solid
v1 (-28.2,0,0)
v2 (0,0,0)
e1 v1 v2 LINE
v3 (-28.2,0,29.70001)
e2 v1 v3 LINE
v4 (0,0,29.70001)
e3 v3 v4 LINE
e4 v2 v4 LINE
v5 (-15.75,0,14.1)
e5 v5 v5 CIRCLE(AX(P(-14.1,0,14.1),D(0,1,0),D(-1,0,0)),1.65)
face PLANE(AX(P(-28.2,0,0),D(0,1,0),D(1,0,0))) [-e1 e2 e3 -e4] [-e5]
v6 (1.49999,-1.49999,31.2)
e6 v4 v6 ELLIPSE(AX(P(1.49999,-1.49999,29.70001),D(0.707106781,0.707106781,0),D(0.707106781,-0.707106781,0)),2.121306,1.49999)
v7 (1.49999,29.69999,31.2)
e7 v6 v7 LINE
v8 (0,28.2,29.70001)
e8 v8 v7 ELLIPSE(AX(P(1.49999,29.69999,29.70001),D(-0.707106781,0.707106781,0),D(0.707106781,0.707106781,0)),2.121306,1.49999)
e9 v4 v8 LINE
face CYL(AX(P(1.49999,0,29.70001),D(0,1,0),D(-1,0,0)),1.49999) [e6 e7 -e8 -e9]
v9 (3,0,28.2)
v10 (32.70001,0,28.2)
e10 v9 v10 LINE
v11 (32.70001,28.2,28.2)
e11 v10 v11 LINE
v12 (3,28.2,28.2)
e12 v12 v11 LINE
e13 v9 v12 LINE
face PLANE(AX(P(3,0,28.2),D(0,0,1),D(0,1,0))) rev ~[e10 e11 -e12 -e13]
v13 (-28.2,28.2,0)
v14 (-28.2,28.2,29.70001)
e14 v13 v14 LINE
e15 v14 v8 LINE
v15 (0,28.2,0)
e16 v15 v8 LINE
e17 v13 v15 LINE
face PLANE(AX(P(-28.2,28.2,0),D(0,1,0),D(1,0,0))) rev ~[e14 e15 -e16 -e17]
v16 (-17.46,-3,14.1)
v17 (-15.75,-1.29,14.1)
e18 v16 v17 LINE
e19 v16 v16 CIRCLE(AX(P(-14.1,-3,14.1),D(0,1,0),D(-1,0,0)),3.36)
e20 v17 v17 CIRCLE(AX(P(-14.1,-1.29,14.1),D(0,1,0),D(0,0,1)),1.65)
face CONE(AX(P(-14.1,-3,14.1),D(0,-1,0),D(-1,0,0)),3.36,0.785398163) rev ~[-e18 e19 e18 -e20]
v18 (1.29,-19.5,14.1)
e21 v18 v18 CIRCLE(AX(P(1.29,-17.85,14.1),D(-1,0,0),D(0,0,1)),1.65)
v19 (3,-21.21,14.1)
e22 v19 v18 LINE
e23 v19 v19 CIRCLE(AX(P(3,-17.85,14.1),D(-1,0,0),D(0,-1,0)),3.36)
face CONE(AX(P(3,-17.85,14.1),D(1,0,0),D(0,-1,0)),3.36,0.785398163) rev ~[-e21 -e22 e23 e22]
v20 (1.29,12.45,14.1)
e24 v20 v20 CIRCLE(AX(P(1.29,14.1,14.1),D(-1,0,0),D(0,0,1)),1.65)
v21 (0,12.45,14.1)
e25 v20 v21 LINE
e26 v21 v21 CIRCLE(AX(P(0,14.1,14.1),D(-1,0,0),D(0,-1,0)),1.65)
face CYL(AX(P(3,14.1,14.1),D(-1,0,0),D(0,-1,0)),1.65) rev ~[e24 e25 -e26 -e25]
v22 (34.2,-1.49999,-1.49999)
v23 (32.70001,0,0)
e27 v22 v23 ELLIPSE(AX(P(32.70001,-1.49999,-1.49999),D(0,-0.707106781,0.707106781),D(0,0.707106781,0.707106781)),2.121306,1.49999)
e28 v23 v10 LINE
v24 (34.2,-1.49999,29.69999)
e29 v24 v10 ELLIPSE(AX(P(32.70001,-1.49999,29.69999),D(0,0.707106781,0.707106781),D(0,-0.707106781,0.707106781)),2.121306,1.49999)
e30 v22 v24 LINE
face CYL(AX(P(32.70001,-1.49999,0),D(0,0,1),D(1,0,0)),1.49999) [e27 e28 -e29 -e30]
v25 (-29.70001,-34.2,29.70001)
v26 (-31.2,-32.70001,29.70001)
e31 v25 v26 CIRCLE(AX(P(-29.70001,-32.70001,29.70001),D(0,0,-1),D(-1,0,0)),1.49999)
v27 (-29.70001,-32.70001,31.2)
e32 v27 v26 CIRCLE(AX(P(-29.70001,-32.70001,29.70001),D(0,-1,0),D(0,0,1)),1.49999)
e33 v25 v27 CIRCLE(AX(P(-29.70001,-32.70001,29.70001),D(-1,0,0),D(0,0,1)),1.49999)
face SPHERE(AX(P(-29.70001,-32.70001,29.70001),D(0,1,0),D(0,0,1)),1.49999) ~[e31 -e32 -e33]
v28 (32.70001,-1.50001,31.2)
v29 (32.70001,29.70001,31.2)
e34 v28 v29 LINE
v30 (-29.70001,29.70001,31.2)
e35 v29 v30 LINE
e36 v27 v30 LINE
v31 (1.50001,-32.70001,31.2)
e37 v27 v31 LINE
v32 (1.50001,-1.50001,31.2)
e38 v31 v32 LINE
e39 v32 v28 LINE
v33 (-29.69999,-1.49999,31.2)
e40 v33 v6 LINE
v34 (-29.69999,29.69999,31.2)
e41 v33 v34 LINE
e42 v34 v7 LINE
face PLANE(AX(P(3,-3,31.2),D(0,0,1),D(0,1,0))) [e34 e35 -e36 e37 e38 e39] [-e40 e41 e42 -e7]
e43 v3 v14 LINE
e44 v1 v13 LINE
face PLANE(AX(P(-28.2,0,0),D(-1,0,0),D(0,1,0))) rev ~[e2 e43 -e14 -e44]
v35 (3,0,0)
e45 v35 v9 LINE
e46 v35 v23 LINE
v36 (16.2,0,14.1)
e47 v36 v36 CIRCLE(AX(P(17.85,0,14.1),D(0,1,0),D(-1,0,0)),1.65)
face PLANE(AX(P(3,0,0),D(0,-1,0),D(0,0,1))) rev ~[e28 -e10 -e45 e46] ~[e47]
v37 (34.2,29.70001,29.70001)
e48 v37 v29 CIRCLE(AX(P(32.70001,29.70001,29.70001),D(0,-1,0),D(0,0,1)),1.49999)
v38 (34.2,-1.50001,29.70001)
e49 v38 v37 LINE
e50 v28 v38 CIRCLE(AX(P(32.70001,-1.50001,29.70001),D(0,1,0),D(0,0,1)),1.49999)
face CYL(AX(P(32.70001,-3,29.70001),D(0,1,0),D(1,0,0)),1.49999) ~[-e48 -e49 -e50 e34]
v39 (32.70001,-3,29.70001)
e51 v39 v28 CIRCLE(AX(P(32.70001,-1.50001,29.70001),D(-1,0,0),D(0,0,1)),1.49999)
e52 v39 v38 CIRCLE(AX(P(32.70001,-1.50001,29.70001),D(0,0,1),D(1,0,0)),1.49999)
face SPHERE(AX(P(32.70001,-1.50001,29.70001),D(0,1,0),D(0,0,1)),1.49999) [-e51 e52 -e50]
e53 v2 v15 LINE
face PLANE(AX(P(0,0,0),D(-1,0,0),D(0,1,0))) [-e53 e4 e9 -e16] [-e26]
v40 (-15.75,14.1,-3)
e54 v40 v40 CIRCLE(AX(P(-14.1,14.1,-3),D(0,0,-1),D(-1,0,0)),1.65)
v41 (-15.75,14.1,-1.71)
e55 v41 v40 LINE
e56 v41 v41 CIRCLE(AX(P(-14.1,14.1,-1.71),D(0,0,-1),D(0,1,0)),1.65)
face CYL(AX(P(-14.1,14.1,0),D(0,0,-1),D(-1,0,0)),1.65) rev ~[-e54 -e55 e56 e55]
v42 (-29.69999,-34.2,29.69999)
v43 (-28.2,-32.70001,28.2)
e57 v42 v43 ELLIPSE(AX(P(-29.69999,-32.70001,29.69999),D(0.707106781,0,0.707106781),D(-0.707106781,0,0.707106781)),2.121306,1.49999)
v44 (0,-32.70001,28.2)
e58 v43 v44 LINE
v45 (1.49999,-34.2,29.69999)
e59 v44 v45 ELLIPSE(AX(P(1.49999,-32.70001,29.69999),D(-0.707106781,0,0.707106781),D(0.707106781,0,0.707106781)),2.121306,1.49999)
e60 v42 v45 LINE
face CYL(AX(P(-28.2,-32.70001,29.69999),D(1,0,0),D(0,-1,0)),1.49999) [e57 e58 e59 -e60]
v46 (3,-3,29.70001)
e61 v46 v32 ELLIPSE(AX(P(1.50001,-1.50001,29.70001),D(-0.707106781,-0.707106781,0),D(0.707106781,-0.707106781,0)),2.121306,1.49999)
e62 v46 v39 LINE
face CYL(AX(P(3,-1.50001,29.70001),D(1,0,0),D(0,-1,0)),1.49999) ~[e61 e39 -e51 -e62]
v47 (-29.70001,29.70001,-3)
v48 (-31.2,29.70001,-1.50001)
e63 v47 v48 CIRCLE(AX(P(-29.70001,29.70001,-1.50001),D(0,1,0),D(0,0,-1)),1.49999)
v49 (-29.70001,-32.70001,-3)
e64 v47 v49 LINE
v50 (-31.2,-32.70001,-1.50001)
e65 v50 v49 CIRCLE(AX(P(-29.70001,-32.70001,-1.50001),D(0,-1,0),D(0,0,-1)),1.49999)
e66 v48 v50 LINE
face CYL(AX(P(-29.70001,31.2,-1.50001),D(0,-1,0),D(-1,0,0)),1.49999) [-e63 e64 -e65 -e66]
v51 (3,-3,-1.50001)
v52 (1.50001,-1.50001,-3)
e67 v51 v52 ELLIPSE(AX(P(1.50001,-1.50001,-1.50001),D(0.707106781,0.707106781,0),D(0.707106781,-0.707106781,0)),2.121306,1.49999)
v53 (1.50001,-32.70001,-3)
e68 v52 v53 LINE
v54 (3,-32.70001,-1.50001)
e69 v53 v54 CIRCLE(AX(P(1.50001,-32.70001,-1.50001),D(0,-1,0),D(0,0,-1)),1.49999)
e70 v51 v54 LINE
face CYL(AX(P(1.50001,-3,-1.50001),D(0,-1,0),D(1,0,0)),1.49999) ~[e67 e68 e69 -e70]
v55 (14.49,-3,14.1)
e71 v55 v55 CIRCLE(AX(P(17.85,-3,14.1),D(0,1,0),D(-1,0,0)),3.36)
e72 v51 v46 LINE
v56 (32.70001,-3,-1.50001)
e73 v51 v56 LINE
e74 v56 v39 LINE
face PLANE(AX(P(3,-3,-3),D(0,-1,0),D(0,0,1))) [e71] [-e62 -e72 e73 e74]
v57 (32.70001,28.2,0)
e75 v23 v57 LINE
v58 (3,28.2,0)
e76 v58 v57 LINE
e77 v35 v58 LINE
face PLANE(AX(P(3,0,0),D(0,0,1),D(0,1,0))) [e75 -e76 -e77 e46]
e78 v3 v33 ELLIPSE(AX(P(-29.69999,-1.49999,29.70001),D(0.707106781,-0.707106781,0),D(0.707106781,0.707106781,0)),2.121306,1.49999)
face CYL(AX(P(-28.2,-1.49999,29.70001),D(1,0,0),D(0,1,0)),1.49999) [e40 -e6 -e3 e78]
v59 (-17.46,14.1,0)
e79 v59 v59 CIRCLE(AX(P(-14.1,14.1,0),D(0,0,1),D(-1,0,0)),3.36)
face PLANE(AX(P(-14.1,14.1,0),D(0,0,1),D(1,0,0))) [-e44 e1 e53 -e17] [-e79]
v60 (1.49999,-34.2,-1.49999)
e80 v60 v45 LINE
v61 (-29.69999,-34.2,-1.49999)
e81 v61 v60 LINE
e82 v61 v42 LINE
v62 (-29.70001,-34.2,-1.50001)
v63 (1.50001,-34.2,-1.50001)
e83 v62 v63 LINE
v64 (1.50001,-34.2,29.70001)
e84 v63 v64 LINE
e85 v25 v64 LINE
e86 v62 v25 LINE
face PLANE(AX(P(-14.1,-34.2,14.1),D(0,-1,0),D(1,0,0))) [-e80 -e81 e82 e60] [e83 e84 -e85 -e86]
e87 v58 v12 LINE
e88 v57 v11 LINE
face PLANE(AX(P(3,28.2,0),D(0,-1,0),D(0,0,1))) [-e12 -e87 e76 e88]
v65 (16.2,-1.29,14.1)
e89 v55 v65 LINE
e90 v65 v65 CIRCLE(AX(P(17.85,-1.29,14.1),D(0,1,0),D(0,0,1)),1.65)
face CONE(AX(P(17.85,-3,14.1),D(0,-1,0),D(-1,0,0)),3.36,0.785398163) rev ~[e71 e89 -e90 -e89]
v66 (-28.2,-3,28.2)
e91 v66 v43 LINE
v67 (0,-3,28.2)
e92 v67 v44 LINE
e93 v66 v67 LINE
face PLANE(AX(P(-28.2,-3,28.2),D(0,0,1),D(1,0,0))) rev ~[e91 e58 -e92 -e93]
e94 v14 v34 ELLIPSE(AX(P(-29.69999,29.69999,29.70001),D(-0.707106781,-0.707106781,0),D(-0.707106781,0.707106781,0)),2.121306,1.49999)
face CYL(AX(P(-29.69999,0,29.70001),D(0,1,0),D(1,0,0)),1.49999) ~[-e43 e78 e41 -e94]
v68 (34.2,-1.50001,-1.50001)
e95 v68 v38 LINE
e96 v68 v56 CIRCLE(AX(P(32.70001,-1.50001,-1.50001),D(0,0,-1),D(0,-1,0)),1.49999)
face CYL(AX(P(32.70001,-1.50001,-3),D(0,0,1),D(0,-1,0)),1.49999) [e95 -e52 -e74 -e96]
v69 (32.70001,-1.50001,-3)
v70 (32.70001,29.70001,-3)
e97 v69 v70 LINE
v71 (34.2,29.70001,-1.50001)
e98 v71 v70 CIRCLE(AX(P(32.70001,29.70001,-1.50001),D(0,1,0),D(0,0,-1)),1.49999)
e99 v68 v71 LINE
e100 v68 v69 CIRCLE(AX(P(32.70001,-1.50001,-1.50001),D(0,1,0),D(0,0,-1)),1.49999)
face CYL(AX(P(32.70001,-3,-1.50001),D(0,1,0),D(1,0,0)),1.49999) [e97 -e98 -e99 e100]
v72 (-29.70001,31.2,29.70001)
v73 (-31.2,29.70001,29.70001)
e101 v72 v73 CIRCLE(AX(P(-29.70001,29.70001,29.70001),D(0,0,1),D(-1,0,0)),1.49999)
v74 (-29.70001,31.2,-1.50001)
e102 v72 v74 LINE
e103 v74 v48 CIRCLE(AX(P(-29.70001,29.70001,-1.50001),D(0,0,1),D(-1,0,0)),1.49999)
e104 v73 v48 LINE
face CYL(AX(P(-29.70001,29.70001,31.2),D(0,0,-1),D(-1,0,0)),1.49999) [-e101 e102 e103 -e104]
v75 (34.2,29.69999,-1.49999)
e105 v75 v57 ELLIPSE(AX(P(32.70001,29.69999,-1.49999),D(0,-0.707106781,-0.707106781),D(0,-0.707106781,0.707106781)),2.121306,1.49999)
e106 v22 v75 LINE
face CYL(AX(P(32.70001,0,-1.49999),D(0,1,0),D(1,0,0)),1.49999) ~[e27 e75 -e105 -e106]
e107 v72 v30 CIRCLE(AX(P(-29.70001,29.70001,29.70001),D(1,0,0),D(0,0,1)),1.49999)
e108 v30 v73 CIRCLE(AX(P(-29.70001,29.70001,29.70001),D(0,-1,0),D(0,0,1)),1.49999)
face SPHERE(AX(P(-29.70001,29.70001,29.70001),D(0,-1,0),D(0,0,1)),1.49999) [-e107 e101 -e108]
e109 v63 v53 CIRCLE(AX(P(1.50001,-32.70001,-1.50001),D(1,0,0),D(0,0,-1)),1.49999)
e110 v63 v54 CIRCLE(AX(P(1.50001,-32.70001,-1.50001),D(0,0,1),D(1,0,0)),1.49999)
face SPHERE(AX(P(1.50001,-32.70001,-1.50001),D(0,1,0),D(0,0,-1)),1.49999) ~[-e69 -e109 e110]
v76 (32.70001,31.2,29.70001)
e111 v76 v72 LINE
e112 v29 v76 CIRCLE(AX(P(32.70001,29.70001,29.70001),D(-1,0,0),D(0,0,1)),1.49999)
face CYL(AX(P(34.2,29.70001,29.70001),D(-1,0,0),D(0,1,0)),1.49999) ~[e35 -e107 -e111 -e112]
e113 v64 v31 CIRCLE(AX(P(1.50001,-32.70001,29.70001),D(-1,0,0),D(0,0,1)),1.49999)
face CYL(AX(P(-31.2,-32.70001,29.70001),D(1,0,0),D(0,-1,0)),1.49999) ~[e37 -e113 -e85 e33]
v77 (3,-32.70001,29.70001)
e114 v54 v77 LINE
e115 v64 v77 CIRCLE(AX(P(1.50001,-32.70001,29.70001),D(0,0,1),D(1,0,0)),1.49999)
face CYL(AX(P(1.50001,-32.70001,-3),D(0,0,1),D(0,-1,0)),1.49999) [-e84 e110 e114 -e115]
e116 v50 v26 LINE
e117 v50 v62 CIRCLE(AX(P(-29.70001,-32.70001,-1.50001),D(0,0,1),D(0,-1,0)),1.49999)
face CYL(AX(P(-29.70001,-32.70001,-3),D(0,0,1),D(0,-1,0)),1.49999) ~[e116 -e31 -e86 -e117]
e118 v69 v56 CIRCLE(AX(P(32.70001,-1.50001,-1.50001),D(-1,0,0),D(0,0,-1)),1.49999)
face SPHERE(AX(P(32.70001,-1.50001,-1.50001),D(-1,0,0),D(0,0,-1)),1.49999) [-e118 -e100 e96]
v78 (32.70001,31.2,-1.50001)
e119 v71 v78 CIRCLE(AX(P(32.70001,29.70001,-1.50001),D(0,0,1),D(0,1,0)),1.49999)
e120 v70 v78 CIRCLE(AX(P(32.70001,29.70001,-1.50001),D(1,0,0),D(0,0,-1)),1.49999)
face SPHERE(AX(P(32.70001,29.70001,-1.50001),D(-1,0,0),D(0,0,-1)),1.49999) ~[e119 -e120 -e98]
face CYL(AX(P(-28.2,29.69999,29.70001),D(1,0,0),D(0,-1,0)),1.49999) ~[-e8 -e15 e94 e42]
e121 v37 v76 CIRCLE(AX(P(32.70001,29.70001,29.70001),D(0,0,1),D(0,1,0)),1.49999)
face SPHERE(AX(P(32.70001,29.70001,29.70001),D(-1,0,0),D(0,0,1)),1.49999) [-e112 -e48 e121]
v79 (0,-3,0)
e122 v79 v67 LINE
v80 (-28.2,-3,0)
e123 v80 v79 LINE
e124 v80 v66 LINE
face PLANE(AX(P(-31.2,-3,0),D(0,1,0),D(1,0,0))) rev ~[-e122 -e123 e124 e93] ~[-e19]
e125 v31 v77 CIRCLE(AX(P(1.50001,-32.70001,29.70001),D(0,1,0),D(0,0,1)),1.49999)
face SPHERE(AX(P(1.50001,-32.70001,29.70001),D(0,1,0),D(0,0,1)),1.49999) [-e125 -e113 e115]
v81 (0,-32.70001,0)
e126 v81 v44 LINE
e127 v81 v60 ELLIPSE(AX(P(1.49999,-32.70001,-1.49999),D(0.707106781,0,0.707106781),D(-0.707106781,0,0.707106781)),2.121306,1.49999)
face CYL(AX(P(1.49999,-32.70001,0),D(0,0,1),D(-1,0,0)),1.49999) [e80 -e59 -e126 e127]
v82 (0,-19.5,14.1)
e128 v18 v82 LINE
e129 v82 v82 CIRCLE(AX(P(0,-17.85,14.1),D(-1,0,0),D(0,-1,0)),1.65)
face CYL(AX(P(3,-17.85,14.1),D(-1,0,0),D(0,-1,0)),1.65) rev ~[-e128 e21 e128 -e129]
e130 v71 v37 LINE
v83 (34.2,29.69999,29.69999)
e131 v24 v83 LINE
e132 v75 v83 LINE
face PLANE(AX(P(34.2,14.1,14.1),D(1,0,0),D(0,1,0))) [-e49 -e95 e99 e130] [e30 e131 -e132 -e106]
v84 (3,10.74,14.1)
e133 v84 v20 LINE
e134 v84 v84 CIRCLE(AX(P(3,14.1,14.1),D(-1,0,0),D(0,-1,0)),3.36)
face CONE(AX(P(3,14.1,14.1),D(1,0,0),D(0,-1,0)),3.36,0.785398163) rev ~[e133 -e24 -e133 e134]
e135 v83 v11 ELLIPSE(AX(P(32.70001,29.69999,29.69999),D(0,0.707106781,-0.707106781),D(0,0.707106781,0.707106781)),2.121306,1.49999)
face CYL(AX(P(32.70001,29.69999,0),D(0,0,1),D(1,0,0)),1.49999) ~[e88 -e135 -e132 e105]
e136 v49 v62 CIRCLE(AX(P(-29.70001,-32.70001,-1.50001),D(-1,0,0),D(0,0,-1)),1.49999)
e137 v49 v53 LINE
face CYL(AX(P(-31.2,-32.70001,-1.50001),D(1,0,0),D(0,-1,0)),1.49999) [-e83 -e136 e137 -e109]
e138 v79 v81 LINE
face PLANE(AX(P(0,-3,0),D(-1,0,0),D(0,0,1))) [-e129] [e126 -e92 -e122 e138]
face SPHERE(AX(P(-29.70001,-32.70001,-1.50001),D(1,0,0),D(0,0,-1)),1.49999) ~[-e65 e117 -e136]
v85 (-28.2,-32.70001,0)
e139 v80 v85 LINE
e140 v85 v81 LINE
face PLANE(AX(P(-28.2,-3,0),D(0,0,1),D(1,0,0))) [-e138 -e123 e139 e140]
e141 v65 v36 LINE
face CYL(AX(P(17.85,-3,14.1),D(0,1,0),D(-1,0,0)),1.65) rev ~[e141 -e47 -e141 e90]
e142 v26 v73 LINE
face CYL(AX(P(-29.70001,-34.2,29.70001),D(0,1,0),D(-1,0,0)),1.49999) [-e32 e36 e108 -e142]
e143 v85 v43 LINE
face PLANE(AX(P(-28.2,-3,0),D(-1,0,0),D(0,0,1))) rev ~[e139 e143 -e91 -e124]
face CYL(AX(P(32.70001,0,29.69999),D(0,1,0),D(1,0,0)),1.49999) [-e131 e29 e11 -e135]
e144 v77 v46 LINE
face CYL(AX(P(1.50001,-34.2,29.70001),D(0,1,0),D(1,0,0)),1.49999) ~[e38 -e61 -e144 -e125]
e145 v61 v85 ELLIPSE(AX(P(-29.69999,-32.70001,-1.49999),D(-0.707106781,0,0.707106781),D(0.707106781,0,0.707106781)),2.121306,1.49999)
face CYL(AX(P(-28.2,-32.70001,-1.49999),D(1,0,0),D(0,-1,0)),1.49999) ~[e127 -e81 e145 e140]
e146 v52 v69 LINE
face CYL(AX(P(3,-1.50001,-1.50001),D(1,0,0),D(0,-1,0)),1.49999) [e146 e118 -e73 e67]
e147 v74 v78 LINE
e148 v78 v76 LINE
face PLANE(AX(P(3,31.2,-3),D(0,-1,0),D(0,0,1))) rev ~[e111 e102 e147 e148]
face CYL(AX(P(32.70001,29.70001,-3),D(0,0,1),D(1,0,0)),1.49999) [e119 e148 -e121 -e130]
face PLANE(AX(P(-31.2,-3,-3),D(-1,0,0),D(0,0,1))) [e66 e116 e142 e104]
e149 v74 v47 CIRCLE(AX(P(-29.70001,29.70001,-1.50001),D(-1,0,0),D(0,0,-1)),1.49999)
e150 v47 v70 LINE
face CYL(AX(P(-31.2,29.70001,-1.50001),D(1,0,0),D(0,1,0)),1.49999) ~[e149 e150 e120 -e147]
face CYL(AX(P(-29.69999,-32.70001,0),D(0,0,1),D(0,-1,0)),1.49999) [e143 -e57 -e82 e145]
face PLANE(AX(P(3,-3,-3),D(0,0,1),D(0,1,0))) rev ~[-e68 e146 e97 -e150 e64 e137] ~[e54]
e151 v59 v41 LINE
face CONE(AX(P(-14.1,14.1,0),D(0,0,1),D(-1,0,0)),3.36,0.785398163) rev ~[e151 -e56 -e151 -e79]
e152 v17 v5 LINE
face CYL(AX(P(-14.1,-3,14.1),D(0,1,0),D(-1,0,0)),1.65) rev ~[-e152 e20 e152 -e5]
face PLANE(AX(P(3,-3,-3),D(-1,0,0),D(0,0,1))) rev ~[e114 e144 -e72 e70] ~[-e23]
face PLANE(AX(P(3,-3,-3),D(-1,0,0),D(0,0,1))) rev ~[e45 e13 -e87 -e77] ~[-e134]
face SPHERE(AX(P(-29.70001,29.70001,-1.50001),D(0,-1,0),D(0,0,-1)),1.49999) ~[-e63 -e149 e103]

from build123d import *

# Parameters (mm, degrees)
F0_W                  = 34.2
F0_H                  = 34.2
F0_W_2                = 28.2
F0_H_2                = 28.2
F1_DEPTH              = 3
F2_DEPTH              = 31.2
F3_W                  = 34.2
F3_H                  = 34.2
F3_W_2                = 28.2
F3_H_2                = 28.2
F4_DEPTH              = 31.2
F5_W                  = 34.2
F5_H                  = 34.2
F5_W_2                = 28.2
F5_H_2                = 28.2
F6_DEPTH              = 31.2
F7_D                  = 3.3
F7_DEPTH              = 13.5
F7_CSINK_D            = 6.72
F7_CSINK_ANGLE        = 90
F7_TIP                = 0.9914200214
F7_ON_F5_D            = 3.3
F7_ON_F5_DEPTH        = 13.5
F7_ON_F5_CSINK_D      = 6.72
F7_ON_F5_CSINK_ANGLE  = 90
F7_ON_F5_TIP          = 0.9914200214
F7_ON_F3_D            = 3.3
F7_ON_F3_DEPTH        = 13.5
F7_ON_F3_CSINK_D      = 6.72
F7_ON_F3_CSINK_ANGLE  = 90
F7_ON_F3_TIP          = 0.9914200214
F8_R                  = 1.49999
F11_D                 = 3.3
F11_DEPTH             = 13.5
F11_CSINK_D           = 6.72
F11_CSINK_ANGLE       = 90
F11_TIP               = 0.9914200214
F11_ON_F9_D           = 3.3
F11_ON_F9_DEPTH       = 13.5
F11_ON_F9_CSINK_D     = 6.72
F11_ON_F9_CSINK_ANGLE = 90
F11_ON_F9_TIP         = 0.9914200214


# Not quite as in the source:
# - a fillet or chamfer is up to 0.001 mm smaller than in the source, because OpenCascade refuses the exact size


with BuildPart() as f1:
    # F0 (on Top) → F1 (new body)
    with BuildSketch(Plane.XY):
        with Locations((-14.1, 14.1)):
            Rectangle(F0_W, F0_H)
        with Locations((-14.1, 14.1)):
            Rectangle(F0_W_2, F0_H_2, mode=Mode.SUBTRACT)
        with Locations((-14.1, 14.1)):
            Rectangle(F0_W_2, F0_H_2)
    extrude(amount=-F1_DEPTH)

    # F0 (on Top) → F2 (join)
    with BuildSketch(Plane.XY):
        with Locations((-14.1, 14.1)):
            Rectangle(F0_W, F0_H)
        with Locations((-14.1, 14.1)):
            Rectangle(F0_W_2, F0_H_2, mode=Mode.SUBTRACT)
    extrude(amount=F2_DEPTH)

    # F3 (on face) → F4 (join)
    with BuildSketch(Plane.XZ.offset(3)):
        with Locations((-14.1, 14.1)):
            Rectangle(F3_W, F3_H)
        with Locations((-14.1, 14.1)):
            Rectangle(F3_W_2, F3_H_2, mode=Mode.SUBTRACT)
    extrude(amount=F4_DEPTH)

    # F5 (on face) → F6 (join)
    with BuildSketch(Plane.YZ.offset(3)):
        with Locations((14.1, 14.1)):
            Rectangle(F5_W, F5_H)
        with Locations((14.1, 14.1)):
            Rectangle(F5_W_2, F5_H_2, mode=Mode.SUBTRACT)
    extrude(amount=F6_DEPTH)

    # F7
    with Locations(Plane.XY):
        with Locations((-14.1, 14.1)):
            CounterSinkHole(F7_D / 2, F7_CSINK_D / 2, depth=F7_DEPTH, counter_sink_angle=F7_CSINK_ANGLE)
            with Locations((0, 0, -(F7_DEPTH + F7_TIP / 2))):  # 118° drill point
                Cone(0, F7_D / 2, F7_TIP, mode=Mode.SUBTRACT)

    # F7 on F5
    with Locations(Plane.YZ.offset(3)):
        with Locations((14.1, 14.1)):
            CounterSinkHole(F7_ON_F5_D / 2, F7_ON_F5_CSINK_D / 2, depth=F7_ON_F5_DEPTH, counter_sink_angle=F7_ON_F5_CSINK_ANGLE)
            with Locations((0, 0, -(F7_ON_F5_DEPTH + F7_ON_F5_TIP / 2))):  # 118° drill point
                Cone(0, F7_ON_F5_D / 2, F7_ON_F5_TIP, mode=Mode.SUBTRACT)

    # F7 on F3
    with Locations(Plane.XZ.offset(3)):
        with Locations((-14.1, 14.1)):
            CounterSinkHole(F7_ON_F3_D / 2, F7_ON_F3_CSINK_D / 2, depth=F7_ON_F3_DEPTH, counter_sink_angle=F7_ON_F3_CSINK_ANGLE)
            with Locations((0, 0, -(F7_ON_F3_DEPTH + F7_ON_F3_TIP / 2))):  # 118° drill point
                Cone(0, F7_ON_F3_D / 2, F7_ON_F3_TIP, mode=Mode.SUBTRACT)

    # F8 (radius 1.5 in the source; OpenCascade refuses exactly that, so slightly less here)
    f8_edges = [f1.edges().sort_by_distance(p)[0] for p in [
        (-31.2, -1.5, 31.2),
        (1.5, 31.2, 31.2),
        (34.2, 14.1, 31.2),
        (18.6, -3, 31.2),
        (3, -18.6, 31.2),
        (-14.1, -34.2, 31.2),
        (-14.1, 0, 31.2),
        (0, 14.1, 31.2),
        (-28.2, 14.1, 31.2),
        (-14.1, 28.2, 31.2),
        (18.6, -3, -3),
        (3, -18.6, -3),
        (-14.1, -34.2, -3),
        (-31.2, -1.5, -3),
        (1.5, 31.2, -3),
        (34.2, 14.1, -3),
        (3, -34.2, 14.1),
        (0, -34.2, 14.1),
        (-28.2, -34.2, 14.1),
        (-31.2, -34.2, 14.1),
        (-14.1, -34.2, 28.2),
        (-14.1, -34.2, 0),
        (-31.2, 31.2, 14.1),
        (34.2, 31.2, 14.1),
        (34.2, 28.2, 14.1),
        (34.2, 0, 14.1),
        (34.2, -3, 14.1),
        (34.2, 14.1, 0),
        (34.2, 14.1, 28.2),
    ]]
    fillet(f8_edges, radius=F8_R)

    # F11
    with Locations(Plane.XZ.offset(3)):
        with Locations((17.85, 14.1)):
            CounterSinkHole(F11_D / 2, F11_CSINK_D / 2, depth=F11_DEPTH, counter_sink_angle=F11_CSINK_ANGLE)
            with Locations((0, 0, -(F11_DEPTH + F11_TIP / 2))):  # 118° drill point
                Cone(0, F11_D / 2, F11_TIP, mode=Mode.SUBTRACT)

    # F11 on F9
    with Locations(Plane.YZ.offset(3)):
        with Locations((-17.85, 14.1)):
            CounterSinkHole(F11_ON_F9_D / 2, F11_ON_F9_CSINK_D / 2, depth=F11_ON_F9_DEPTH, counter_sink_angle=F11_ON_F9_CSINK_ANGLE)
            with Locations((0, 0, -(F11_ON_F9_DEPTH + F11_ON_F9_TIP / 2))):  # 118° drill point
                Cone(0, F11_ON_F9_D / 2, F11_ON_F9_TIP, mode=Mode.SUBTRACT)


solid = f1.part
